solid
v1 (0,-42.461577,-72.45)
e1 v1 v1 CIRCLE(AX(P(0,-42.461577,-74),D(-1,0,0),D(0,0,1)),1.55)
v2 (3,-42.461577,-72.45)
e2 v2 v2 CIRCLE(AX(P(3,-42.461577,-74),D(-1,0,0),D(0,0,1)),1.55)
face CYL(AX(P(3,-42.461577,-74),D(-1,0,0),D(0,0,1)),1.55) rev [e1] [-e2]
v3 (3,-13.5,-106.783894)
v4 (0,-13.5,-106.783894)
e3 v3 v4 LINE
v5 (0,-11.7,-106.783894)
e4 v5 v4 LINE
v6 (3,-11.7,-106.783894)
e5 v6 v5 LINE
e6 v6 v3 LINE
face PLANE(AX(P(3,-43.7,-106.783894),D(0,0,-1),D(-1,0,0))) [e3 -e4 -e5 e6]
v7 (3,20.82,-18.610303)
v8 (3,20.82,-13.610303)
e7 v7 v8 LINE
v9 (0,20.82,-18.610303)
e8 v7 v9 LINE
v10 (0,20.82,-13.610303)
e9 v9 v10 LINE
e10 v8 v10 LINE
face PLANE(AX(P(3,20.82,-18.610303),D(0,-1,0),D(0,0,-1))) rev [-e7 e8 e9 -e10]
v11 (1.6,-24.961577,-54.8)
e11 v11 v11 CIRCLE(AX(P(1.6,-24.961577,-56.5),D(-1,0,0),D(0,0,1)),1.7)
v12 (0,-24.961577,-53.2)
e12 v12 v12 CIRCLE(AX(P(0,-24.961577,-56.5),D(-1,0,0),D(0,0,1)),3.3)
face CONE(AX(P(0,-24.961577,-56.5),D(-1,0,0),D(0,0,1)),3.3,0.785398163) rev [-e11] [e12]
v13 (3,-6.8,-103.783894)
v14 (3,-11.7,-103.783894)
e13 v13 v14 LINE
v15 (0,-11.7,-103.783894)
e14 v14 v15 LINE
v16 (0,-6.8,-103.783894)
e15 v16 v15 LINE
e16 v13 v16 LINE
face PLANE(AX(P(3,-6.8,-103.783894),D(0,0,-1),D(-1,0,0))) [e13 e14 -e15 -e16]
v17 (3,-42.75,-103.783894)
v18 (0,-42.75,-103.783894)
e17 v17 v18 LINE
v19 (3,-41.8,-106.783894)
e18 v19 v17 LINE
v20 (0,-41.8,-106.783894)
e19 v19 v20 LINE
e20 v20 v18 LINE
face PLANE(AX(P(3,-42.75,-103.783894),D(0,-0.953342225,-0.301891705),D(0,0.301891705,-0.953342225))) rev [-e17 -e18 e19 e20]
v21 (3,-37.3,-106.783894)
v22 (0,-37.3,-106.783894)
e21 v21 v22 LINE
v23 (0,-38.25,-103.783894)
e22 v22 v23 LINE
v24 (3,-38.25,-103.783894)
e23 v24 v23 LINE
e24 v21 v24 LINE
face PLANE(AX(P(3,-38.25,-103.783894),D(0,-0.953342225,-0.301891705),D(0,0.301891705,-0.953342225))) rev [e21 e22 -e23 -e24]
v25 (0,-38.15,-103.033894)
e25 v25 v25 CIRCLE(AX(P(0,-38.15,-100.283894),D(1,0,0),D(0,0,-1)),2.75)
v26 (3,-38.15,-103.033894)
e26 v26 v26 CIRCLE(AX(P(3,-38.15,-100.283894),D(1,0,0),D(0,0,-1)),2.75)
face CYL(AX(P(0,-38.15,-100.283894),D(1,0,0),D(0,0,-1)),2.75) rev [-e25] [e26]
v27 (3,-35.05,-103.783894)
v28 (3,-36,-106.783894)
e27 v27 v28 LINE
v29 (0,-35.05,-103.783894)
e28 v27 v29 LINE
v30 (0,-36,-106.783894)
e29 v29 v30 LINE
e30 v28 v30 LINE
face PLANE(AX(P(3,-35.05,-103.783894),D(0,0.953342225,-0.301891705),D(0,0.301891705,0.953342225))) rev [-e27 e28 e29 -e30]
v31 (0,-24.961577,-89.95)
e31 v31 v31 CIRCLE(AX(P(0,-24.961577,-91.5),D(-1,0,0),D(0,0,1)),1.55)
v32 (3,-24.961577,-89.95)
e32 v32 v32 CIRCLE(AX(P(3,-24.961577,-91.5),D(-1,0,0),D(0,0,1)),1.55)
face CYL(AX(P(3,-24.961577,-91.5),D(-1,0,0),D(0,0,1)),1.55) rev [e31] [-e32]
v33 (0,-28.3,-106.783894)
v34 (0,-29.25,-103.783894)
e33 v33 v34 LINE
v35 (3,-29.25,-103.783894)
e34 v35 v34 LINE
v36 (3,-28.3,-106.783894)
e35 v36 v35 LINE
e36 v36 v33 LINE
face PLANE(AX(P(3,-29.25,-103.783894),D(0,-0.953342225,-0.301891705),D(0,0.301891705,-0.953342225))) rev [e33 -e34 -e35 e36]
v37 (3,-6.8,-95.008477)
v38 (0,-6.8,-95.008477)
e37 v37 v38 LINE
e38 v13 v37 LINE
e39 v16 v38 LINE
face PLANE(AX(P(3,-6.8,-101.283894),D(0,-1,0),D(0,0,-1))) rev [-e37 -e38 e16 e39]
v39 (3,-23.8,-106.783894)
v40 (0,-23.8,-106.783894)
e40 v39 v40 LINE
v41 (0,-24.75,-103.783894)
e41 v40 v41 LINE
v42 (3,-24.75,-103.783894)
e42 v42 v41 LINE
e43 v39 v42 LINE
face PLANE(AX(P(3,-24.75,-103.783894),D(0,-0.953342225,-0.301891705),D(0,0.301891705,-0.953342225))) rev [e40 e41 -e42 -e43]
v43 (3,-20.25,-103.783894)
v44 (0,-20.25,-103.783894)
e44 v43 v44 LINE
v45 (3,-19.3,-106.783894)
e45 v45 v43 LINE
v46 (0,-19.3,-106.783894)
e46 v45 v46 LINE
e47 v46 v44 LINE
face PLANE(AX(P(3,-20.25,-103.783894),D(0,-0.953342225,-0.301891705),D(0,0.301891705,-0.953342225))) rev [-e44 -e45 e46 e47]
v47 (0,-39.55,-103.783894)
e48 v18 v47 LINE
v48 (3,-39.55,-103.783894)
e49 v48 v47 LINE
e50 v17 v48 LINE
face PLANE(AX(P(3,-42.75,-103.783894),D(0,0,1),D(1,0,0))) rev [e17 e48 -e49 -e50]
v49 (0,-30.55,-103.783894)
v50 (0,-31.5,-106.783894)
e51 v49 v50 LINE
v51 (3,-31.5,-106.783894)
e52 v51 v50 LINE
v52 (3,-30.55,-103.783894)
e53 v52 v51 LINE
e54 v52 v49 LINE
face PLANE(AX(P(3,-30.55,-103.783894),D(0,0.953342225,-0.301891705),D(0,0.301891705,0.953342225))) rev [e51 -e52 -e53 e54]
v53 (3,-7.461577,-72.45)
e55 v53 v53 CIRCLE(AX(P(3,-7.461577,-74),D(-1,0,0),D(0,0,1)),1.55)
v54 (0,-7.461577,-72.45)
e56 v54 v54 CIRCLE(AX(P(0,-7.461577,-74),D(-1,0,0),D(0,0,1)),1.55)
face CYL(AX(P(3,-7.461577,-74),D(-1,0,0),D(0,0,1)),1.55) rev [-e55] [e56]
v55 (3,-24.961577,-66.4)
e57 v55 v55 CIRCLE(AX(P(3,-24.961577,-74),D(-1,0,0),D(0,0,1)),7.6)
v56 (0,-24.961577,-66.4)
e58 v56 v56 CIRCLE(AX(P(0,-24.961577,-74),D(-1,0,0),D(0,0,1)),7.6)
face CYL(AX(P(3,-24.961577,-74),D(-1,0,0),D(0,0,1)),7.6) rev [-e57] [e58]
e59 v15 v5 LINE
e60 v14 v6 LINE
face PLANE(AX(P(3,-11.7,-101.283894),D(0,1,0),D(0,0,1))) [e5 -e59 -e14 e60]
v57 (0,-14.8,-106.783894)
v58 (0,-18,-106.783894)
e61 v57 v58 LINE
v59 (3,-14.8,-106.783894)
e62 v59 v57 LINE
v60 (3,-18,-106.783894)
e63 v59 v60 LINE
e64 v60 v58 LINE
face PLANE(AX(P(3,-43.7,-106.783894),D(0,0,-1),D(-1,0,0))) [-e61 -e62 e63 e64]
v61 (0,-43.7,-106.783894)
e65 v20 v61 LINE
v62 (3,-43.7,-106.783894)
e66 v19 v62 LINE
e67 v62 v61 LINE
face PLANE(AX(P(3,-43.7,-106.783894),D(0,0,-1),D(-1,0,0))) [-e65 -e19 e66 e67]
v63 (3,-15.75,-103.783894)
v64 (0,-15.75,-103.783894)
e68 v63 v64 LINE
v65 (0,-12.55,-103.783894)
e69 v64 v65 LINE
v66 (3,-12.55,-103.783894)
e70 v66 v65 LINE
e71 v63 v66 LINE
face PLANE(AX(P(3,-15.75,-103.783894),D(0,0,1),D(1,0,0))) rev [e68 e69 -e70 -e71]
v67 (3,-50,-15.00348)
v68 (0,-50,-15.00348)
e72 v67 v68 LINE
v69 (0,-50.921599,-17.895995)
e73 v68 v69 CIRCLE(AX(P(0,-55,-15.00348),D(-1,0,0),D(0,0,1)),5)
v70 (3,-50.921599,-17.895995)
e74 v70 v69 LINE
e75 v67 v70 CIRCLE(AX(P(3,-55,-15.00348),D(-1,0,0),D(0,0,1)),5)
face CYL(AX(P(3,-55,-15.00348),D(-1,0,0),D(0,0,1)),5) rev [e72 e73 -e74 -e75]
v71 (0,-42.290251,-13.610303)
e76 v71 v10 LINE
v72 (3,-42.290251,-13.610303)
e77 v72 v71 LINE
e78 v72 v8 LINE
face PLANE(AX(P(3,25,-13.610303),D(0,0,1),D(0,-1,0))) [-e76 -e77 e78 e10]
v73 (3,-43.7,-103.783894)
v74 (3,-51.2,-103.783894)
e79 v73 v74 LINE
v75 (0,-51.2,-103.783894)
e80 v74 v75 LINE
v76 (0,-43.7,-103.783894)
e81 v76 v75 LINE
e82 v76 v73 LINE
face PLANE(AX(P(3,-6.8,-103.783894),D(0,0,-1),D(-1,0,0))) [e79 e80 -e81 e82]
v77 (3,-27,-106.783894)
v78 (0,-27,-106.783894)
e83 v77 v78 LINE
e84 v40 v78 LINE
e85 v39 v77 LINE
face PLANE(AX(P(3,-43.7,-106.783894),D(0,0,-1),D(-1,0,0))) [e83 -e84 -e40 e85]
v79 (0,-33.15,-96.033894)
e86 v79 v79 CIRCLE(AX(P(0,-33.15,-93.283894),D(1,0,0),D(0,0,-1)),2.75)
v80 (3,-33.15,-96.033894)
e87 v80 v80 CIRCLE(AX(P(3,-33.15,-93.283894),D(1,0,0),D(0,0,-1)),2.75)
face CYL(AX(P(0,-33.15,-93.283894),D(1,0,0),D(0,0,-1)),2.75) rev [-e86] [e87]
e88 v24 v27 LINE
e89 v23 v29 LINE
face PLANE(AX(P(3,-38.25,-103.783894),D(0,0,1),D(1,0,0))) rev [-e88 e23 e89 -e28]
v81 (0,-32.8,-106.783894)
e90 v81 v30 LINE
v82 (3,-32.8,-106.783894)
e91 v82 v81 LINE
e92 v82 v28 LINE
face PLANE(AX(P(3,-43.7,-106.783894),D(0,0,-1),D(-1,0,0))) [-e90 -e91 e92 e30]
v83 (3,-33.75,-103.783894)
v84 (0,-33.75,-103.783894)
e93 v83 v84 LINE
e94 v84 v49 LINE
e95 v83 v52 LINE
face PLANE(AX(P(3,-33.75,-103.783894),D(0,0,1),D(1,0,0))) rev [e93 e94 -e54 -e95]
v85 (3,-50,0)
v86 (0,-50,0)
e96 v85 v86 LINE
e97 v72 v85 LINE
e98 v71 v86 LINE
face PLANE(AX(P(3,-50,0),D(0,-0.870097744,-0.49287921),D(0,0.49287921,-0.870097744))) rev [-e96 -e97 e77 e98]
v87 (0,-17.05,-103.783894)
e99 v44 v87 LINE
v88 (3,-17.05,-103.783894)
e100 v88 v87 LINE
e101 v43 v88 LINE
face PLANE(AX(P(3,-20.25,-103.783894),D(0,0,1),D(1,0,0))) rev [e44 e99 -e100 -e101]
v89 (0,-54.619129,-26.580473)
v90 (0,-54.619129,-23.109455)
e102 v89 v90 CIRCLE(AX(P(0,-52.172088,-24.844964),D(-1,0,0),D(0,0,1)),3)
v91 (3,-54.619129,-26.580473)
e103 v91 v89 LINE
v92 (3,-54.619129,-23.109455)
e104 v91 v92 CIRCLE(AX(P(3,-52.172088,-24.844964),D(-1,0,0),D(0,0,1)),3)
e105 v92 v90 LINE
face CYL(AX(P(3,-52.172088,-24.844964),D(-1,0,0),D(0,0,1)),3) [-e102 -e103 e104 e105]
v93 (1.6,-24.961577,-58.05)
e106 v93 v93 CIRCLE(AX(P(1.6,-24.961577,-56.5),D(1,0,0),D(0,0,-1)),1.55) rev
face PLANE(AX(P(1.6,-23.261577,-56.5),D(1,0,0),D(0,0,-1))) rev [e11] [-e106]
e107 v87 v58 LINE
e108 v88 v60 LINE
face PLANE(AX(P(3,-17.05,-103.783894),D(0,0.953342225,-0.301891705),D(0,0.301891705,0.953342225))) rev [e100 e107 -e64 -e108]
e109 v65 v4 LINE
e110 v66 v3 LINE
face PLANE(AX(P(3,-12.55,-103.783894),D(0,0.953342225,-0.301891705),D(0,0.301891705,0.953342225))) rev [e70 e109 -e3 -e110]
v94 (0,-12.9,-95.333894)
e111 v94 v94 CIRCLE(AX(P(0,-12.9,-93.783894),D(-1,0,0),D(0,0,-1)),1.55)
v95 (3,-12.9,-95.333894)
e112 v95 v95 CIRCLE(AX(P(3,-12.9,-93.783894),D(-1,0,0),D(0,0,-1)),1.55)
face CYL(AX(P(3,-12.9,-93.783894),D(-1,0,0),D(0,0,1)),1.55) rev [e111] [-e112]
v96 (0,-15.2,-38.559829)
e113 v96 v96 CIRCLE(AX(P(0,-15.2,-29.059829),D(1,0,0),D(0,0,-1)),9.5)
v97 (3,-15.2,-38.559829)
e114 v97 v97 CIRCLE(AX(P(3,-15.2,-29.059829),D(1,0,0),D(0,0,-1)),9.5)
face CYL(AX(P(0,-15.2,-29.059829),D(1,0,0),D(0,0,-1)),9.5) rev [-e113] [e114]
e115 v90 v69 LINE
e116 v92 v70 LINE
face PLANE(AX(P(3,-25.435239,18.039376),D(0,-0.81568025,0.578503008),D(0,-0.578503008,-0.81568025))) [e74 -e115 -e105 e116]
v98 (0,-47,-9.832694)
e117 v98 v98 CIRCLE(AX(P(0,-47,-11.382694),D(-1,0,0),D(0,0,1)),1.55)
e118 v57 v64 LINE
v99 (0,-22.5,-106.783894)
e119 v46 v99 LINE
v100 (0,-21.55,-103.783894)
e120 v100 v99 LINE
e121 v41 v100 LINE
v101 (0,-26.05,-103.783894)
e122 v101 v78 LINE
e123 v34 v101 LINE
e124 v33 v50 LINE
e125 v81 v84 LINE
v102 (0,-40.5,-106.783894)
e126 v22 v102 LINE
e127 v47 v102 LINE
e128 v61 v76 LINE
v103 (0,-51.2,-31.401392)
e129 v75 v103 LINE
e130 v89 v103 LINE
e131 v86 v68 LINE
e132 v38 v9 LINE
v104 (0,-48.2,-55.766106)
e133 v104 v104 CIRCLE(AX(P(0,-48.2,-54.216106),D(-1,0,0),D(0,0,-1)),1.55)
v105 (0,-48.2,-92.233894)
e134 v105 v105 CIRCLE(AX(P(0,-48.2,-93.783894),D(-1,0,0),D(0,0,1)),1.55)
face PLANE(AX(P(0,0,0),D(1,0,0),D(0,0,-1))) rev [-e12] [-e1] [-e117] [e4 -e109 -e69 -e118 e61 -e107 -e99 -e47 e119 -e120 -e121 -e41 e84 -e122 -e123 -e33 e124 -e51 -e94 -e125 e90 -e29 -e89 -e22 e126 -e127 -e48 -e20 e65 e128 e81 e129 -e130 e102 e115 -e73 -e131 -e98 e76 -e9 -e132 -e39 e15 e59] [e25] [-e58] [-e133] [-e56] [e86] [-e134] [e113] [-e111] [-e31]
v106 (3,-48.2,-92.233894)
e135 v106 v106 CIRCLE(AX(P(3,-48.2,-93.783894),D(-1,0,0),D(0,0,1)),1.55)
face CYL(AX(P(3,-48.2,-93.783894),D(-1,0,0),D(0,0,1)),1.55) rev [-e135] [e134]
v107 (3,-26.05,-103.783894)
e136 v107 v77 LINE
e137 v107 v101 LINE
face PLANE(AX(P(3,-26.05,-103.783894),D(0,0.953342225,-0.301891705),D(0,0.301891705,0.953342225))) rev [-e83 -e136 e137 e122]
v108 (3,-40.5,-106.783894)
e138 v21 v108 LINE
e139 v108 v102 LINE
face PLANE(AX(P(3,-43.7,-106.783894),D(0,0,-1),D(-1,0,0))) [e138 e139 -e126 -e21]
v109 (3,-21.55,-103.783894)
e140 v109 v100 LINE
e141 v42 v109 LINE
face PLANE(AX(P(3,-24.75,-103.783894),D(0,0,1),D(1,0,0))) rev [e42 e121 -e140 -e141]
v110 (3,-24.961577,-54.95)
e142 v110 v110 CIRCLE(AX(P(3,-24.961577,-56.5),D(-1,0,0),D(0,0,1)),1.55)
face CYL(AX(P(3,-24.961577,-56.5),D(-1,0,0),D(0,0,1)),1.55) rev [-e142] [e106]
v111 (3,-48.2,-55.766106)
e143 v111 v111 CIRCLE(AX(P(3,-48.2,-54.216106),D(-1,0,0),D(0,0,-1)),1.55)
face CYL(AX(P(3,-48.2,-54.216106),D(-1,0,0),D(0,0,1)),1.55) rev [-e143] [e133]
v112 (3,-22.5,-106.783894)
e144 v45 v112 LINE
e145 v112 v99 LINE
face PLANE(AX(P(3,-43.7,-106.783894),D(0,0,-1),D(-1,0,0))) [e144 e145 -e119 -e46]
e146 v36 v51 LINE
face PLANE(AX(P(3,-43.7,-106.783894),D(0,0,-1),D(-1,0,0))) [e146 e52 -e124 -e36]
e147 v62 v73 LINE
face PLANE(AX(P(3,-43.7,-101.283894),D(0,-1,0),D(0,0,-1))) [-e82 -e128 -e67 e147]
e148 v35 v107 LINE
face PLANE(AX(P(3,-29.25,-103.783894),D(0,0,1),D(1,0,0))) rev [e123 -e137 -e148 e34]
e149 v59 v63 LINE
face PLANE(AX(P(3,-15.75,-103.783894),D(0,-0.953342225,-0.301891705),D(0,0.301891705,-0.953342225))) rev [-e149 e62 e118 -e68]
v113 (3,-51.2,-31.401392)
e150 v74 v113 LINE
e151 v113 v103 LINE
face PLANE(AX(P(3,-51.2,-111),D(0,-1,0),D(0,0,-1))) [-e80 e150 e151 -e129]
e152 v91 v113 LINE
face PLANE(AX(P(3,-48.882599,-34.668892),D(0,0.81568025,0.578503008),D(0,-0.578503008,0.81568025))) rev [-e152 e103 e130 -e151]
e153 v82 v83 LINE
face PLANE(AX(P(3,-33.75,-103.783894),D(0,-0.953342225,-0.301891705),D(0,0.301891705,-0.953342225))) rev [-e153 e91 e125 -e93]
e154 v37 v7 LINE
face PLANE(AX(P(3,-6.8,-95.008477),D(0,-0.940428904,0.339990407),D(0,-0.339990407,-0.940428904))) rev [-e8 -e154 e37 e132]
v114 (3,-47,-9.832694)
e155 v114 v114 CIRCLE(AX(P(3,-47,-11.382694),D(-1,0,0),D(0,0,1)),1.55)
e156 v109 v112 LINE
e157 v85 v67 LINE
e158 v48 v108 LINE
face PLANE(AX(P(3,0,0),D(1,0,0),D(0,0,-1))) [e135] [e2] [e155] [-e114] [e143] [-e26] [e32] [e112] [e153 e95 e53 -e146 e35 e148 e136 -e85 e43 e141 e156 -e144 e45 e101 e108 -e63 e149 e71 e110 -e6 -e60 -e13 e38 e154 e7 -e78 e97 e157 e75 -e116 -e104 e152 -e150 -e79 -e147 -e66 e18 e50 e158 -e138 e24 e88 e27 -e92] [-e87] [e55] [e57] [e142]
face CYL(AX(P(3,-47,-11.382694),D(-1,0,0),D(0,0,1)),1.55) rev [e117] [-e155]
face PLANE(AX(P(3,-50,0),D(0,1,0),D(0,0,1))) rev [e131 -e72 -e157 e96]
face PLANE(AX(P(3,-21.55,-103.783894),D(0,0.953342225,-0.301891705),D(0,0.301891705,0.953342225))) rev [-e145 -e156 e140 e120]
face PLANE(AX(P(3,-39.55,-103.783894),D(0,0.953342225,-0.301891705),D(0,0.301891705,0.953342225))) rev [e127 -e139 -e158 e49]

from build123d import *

# Parameters (mm, degrees)
EXTRUDE_1_DEPTH         = 3
SKETCH_3_R              = 7.6
SKETCH_3_R_2            = 9.5
SKETCH_3_R_3            = 1.55
CUT_EXTRUDE_1_DEPTH     = 112.843640856
EXTRUDE_6_DEPTH         = 3
SKETCH_10_R             = 1.55
CUT_EXTRUDE_3_DEPTH     = 124.991771172
CUT_EXTRUDE_6_DEPTH     = 124.991771172
EXTRUDE_7_DEPTH         = 3
CUT_EXTRUDE_7_DEPTH     = 124.991771172
SKETCH_18_W             = 9.7
SKETCH_18_H             = 35
CUT_EXTRUDE_9_DEPTH     = 124.991771172
SKETCH_19_R             = 1.55
CUT_EXTRUDE_10_DEPTH    = 124.991771172
SKETCH_20_W             = 61.573881036
SKETCH_20_H             = 3.2
SKETCH_20_W_2           = 79.598608315
SKETCH_20_H_2           = 1.2
EXTRUDE_8_DEPTH         = 3
EXTRUDE_START           = -3
EXTRUDE_9_DEPTH         = 3
EXTRUDE_11_DEPTH        = 3
SKETCH_25_R             = 9.5
EXTRUDE_12_DEPTH        = 3
SKETCH_26_R             = 9.5
CUT_EXTRUDE_11_DEPTH    = 124.991771172
EXTRUDE_13_DEPTH        = 3
CUT_EXTRUDE_12_DEPTH    = 3
SKETCH_29_W             = 5.5
SKETCH_29_H             = 32
EXTRUDE_14_DEPTH        = 3
SKETCH_32_W             = 9.716106013
SKETCH_32_H             = 6
CUT_EXTRUDE_13_DEPTH    = 124.991771172
CUT_EXTRUDE_16_DEPTH    = 3
SKETCH_35_W             = 2.5
SKETCH_35_H             = 44.4
EXTRUDE_15_DEPTH        = 3
SKETCH_36_R             = 1.55
CUT_EXTRUDE_14794_DEPTH = 3
EXTRUDE_16_DEPTH        = 3
SKETCH_38_R             = 2.75
CUT_EXTRUDE_L_DEPTH     = 121.232106085
SKETCH_41_R             = 1.55
EXTRUDE_17_DEPTH        = 3
CUT_EXTRUDE_17_DEPTH    = 121.232106085


# Read off the part's stored shape, not the designer's step: 高级异型孔1
with BuildPart() as part:
    # 草图1 → 凸台-拉伸1 (new body)
    with BuildSketch(Plane(origin=(0, 0, 0), x_dir=(0, 0, -1), z_dir=(1, 0, 0))):
        Polygon((0, -50), (18.610302832, -39.45792997), (18.610302832, 40), (58.496702951, 40), (58.496702951, 0), (100, 0), (100, -50), align=None)
    extrude(amount=EXTRUDE_1_DEPTH)

    # 草图3 → 切除-拉伸1 (cut, through all)
    with BuildSketch(Plane.ZY):
        with Locations((-74, -24.961577338)):
            Circle(SKETCH_3_R)
        with Locations((-34.176393222, 0)):
            Circle(SKETCH_3_R_2)
        with Locations((-74, -7.461577338)):
            Circle(SKETCH_3_R_3)
        with Locations((-56.5, -24.961577338)):
            Circle(SKETCH_3_R_3)
        with Locations((-74, -42.461577338)):
            Circle(SKETCH_3_R_3)
        with Locations((-91.5, -24.961577338)):
            Circle(SKETCH_3_R_3)
    extrude(amount=-CUT_EXTRUDE_1_DEPTH, mode=Mode.SUBTRACT)

    # 草图6 → 凸台-拉伸6 (add)
    with BuildSketch(Plane.ZY):
        with BuildLine():
            Line((-102.983893987, -45.2), (-110.983893987, -45.2))
            Line((-110.983893987, -45.2), (-111, -50))
            Line((-111, -50), (-100, -50))
            Line((-100, -50), (-100, 0))
            Line((-100, 0), (-110.983893987, 0))
            Line((-110.983893987, 0), (-110.983893987, -6.8))
            Line((-110.983893987, -6.8), (-102.983893987, -6.8))
            ThreePointArc((-102.983893987, -6.8), (-101.283893987, -8.5), (-102.983893987, -10.2))
            Line((-102.983893987, -10.2), (-110.983893987, -10.2))
            Line((-110.983893987, -10.2), (-110.983893987, -41.8))
            Line((-110.983893987, -41.8), (-102.983893987, -41.8))
            ThreePointArc((-102.983893987, -41.8), (-101.283893987, -43.5), (-102.983893987, -45.2))
        make_face()
        with BuildLine():
            Line((-15.00347976, -50), (-34.686448159, -50))
            ThreePointArc((-34.686448159, -50), (-33.16855591, -50.235967767), (-31.793933119, -50.921598751))
            Line((-31.793933119, -50.921598751), (-26.580472983, -54.619128968))
            ThreePointArc((-26.580472983, -54.619128968), (-25.755699309, -55.030507559), (-24.844963959, -55.172088219))
            ThreePointArc((-24.844963959, -55.172088219), (-23.93422861, -55.030507559), (-23.109454935, -54.619128968))
            Line((-23.109454935, -54.619128968), (-17.8959948, -50.921598751))
            ThreePointArc((-17.8959948, -50.921598751), (-16.521372009, -50.235967767), (-15.00347976, -50))
        make_face()
    extrude(amount=-EXTRUDE_6_DEPTH)

    # 草图10 → 切除-拉伸3 (cut, through all)
    with BuildSketch(Plane.ZY):
        with Locations((-105.983893987, -15.2)):
            Circle(SKETCH_10_R)
        with Locations((-105.983893987, -36.8)):
            Circle(SKETCH_10_R)
    extrude(amount=-CUT_EXTRUDE_3_DEPTH, mode=Mode.SUBTRACT)

    # 草图14 → 切除-拉伸6 (cut, through all)
    with BuildSketch(Plane(origin=(3, 0, 0), x_dir=(0, 0, -1), z_dir=(1, 0, 0))):
        with BuildLine():
            Line((58.496702951, 0), (58.496702951, 40))
            Line((58.496702951, 40), (18.610302832, 40))
            Line((18.610302832, 40), (18.610302832, 18.686206016))
            ThreePointArc((18.610302832, 18.686206016), (44.493983197, 22.023278649), (58.496702951, 0))
        make_face()
    extrude(amount=-CUT_EXTRUDE_6_DEPTH, mode=Mode.SUBTRACT)

    # 草图15 → 凸台-拉伸7 (add)
    with BuildSketch(Plane(origin=(3, 0, 0), x_dir=(0, 0, -1), z_dir=(1, 0, 0))):
        with BuildLine():
            Line((18.610302832, 18.686206016), (18.610302832, -18.686206016))
            ThreePointArc((18.610302832, -18.686206016), (9.856083494, 0), (18.610302832, 18.686206016))
        make_face()
    extrude(amount=-EXTRUDE_7_DEPTH)

    # 草图16 → 切除-拉伸7 (cut, through all)
    with BuildSketch(Plane(origin=(3, 0, 0), x_dir=(0, 0, -1), z_dir=(1, 0, 0))):
        with BuildLine():
            Line((18.610302832, -18.686206016), (18.610302832, 0))
            ThreePointArc((18.610302832, 0), (34.176393222, 15.56609039), (49.742483613, 0))
            Line((49.742483613, 0), (58.496702951, 0))
            ThreePointArc((58.496702951, 0), (23.858803248, 22.023278649), (18.610302832, -18.686206016))
        make_face()
    extrude(amount=-CUT_EXTRUDE_7_DEPTH, mode=Mode.SUBTRACT)

    # 草图18 → 切除-拉伸9 (cut, through all)
    with BuildSketch(Plane.ZY):
        with Locations((-106.133893987, -26)):
            Rectangle(SKETCH_18_W, SKETCH_18_H)
    extrude(amount=-CUT_EXTRUDE_9_DEPTH, mode=Mode.SUBTRACT)

    # 草图19 → 切除-拉伸10 (cut, through all)
    with BuildSketch(Plane.ZY):
        with Locations((-105.983893987, -1.8)):
            Circle(SKETCH_19_R)
        with Locations((-105.993932098, -48.2)):
            Circle(SKETCH_19_R)
    extrude(amount=-CUT_EXTRUDE_10_DEPTH, mode=Mode.SUBTRACT)

    # 草图20 → 凸台-拉伸8 (add)
    with BuildSketch(Plane.ZY):
        with Locations((-80.196953469, 1.6)):
            Rectangle(SKETCH_20_W, SKETCH_20_H)
        with Locations((-71.200695842, -50.6)):
            Rectangle(SKETCH_20_W_2, SKETCH_20_H_2)
    extrude(amount=-EXTRUDE_8_DEPTH)

    # 草图22 → 凸台-拉伸9 (add)
    with BuildSketch(Plane.ZY.offset(EXTRUDE_START)):
        with BuildLine():
            Line((-18.610302832, 0), (-18.610302832, 25))
            Line((-18.610302832, 25), (-41.044918155, 13.968769999))
            ThreePointArc((-41.044918155, 13.968769999), (-25.948784515, 13.213993529), (-18.610302832, 0))
        make_face()
    extrude(amount=EXTRUDE_9_DEPTH)

    # 草图24 → 凸台-拉伸11 (add)
    with BuildSketch(Plane.ZY):
        Polygon((-18.610302832, 25), (-70.983893987, 3.2), (-49.410012951, 3.2), align=None)
    extrude(amount=-EXTRUDE_11_DEPTH)

    # 草图25 → 凸台-拉伸12 (add, through all)
    with BuildSketch(Plane(origin=(3, 0, 0), x_dir=(0, 0, -1), z_dir=(1, 0, 0))):
        with Locations((34.176393222, 0)):
            Circle(SKETCH_25_R)
    extrude(amount=-EXTRUDE_12_DEPTH)

    # 草图26 → 切除-拉伸11 (cut, through all)
    with BuildSketch(Plane(origin=(3, 0, 0), x_dir=(0, 0, -1), z_dir=(1, 0, 0))):
        with Locations((29.059828781, -15.2)):
            Circle(SKETCH_26_R)
    extrude(amount=-CUT_EXTRUDE_11_DEPTH, mode=Mode.SUBTRACT)

    # 草图27 → 凸台-拉伸13 (add)
    with BuildSketch(Plane.ZY):
        Polygon((-18.610302832, -10.2), (-13.610302832, -15.2), (-18.610302832, -20.2), align=None)
    extrude(amount=-EXTRUDE_13_DEPTH)

    # 草图28 → 切除-拉伸12 (cut)
    with BuildSketch(Plane.ZY):
        Polygon((-110.983893987, 3.2), (-101.283893987, 3.2), (-70.983893987, 3.2), (-95.008477086, -6.8), (-101.283893987, -6.8), (-101.283893987, -45.2), (-110.983893987, -45.2), align=None)
    extrude(amount=-CUT_EXTRUDE_12_DEPTH, mode=Mode.SUBTRACT)

    # 草图29 → 凸台-拉伸14 (add)
    with BuildSketch(Plane.ZY):
        with Locations((-104.033893987, -27.7)):
            Rectangle(SKETCH_29_W, SKETCH_29_H)
    extrude(amount=-EXTRUDE_14_DEPTH)

    # 草图32 → 切除-拉伸13 (cut, through all)
    with BuildSketch(Plane.ZY):
        with Locations((-106.141946993, -48.2)):
            Rectangle(SKETCH_32_W, SKETCH_32_H)
    extrude(amount=-CUT_EXTRUDE_13_DEPTH, mode=Mode.SUBTRACT)

    # 草图34 → 切除-拉伸16 (cut)
    with BuildSketch(Plane.ZY):
        Polygon((-103.783893987, -15.75), (-103.783893987, -12.55), (-106.783893987, -13.5), (-106.783893987, -14.8), align=None)
        Polygon((-106.783893987, -18), (-106.783893987, -19.3), (-103.783893987, -20.25), (-103.783893987, -17.05), align=None)
        Polygon((-106.783893987, -22.5), (-106.783893987, -23.8), (-103.783893987, -24.75), (-103.783893987, -21.55), align=None)
        Polygon((-106.783893987, -27), (-106.783893987, -28.3), (-103.783893987, -29.25), (-103.783893987, -26.05), align=None)
        Polygon((-106.783893987, -31.5), (-106.783893987, -32.8), (-103.783893987, -33.75), (-103.783893987, -30.55), align=None)
        Polygon((-106.783893987, -36), (-106.783893987, -37.3), (-103.783893987, -38.25), (-103.783893987, -35.05), align=None)
        Polygon((-106.783893987, -40.5), (-106.783893987, -41.8), (-103.783893987, -42.75), (-103.783893987, -39.55), align=None)
    extrude(amount=-CUT_EXTRUDE_16_DEPTH, mode=Mode.SUBTRACT)

    # 草图35 → 凸台-拉伸15 (add, through all)
    with BuildSketch(Plane.ZY):
        with Locations((-102.533893987, -29)):
            Rectangle(SKETCH_35_W, SKETCH_35_H)
    extrude(amount=-EXTRUDE_15_DEPTH)

    # 草图36 → Cut-Extrude 14794 (cut)
    with BuildSketch(Plane.ZY):
        with Locations((-93.783893987, -48.2)):
            Circle(SKETCH_36_R)
        with Locations(Location((-93.783893987, -12.9, 0), (0, 0, 180))):
            Circle(SKETCH_36_R)
        with Locations((-21.610302832, 20.501770791)):
            Circle(SKETCH_36_R)
        with Locations((-11.382694019, -47)):
            Circle(SKETCH_36_R)
        with Locations(Location((-54.216106013, -48.2, 0), (0, 0, 180))):
            Circle(SKETCH_36_R)
    extrude(amount=-CUT_EXTRUDE_14794_DEPTH, mode=Mode.SUBTRACT)

    # 草图37 → 凸台-拉伸16 (add)
    with BuildSketch(Plane.ZY):
        Polygon((-13.610302832, -39.45792997), (-13.610302832, -42.290250896), (-18.610302832, -39.45792997), (-18.610302832, 25), (-13.610302832, 25), align=None)
    extrude(amount=-EXTRUDE_16_DEPTH)

    # 草图38 → L型支架定位孔 (cut, through all)
    with BuildSketch(Plane(origin=(3, 0, 0), x_dir=(0, 0, -1), z_dir=(1, 0, 0))):
        with Locations((100.283893987, -38.15)):
            Circle(SKETCH_38_R)
        with Locations((93.283893987, -33.15)):
            Circle(SKETCH_38_R)
    extrude(amount=-CUT_EXTRUDE_L_DEPTH, mode=Mode.SUBTRACT)

    # 高级异型孔1 outline → 高级异型孔1 (revolve, cut)
    with BuildSketch(Plane(origin=(0, -24.961577338, -56.5), x_dir=(0, 1, 0), z_dir=(0, 0, -1))):
        Polygon((1.7, 1.6), (1.55, 1.6), (1.55, 0), (3.3, 0), align=None)
    revolve(axis=Axis((0, -24.961577338, -56.5), (1, 0, 0)), mode=Mode.SUBTRACT)

    # 草图41 → 凸台-拉伸17 (add, through all)
    with BuildSketch(Plane.ZY):
        with Locations((-21.610302832, 20.501770791)):
            Circle(SKETCH_41_R)
    extrude(amount=-EXTRUDE_17_DEPTH)

    # 草图42 → 切除-拉伸17 (cut, through all)
    with BuildSketch(Plane.ZY):
        Polygon((-95.008477086, -6.8), (-18.610302832, 20.82), (-13.610302832, 20.82), (-13.610302832, 25), (-18.610302832, 25), align=None)
    extrude(amount=-CUT_EXTRUDE_17_DEPTH, mode=Mode.SUBTRACT)


solid = part.part
